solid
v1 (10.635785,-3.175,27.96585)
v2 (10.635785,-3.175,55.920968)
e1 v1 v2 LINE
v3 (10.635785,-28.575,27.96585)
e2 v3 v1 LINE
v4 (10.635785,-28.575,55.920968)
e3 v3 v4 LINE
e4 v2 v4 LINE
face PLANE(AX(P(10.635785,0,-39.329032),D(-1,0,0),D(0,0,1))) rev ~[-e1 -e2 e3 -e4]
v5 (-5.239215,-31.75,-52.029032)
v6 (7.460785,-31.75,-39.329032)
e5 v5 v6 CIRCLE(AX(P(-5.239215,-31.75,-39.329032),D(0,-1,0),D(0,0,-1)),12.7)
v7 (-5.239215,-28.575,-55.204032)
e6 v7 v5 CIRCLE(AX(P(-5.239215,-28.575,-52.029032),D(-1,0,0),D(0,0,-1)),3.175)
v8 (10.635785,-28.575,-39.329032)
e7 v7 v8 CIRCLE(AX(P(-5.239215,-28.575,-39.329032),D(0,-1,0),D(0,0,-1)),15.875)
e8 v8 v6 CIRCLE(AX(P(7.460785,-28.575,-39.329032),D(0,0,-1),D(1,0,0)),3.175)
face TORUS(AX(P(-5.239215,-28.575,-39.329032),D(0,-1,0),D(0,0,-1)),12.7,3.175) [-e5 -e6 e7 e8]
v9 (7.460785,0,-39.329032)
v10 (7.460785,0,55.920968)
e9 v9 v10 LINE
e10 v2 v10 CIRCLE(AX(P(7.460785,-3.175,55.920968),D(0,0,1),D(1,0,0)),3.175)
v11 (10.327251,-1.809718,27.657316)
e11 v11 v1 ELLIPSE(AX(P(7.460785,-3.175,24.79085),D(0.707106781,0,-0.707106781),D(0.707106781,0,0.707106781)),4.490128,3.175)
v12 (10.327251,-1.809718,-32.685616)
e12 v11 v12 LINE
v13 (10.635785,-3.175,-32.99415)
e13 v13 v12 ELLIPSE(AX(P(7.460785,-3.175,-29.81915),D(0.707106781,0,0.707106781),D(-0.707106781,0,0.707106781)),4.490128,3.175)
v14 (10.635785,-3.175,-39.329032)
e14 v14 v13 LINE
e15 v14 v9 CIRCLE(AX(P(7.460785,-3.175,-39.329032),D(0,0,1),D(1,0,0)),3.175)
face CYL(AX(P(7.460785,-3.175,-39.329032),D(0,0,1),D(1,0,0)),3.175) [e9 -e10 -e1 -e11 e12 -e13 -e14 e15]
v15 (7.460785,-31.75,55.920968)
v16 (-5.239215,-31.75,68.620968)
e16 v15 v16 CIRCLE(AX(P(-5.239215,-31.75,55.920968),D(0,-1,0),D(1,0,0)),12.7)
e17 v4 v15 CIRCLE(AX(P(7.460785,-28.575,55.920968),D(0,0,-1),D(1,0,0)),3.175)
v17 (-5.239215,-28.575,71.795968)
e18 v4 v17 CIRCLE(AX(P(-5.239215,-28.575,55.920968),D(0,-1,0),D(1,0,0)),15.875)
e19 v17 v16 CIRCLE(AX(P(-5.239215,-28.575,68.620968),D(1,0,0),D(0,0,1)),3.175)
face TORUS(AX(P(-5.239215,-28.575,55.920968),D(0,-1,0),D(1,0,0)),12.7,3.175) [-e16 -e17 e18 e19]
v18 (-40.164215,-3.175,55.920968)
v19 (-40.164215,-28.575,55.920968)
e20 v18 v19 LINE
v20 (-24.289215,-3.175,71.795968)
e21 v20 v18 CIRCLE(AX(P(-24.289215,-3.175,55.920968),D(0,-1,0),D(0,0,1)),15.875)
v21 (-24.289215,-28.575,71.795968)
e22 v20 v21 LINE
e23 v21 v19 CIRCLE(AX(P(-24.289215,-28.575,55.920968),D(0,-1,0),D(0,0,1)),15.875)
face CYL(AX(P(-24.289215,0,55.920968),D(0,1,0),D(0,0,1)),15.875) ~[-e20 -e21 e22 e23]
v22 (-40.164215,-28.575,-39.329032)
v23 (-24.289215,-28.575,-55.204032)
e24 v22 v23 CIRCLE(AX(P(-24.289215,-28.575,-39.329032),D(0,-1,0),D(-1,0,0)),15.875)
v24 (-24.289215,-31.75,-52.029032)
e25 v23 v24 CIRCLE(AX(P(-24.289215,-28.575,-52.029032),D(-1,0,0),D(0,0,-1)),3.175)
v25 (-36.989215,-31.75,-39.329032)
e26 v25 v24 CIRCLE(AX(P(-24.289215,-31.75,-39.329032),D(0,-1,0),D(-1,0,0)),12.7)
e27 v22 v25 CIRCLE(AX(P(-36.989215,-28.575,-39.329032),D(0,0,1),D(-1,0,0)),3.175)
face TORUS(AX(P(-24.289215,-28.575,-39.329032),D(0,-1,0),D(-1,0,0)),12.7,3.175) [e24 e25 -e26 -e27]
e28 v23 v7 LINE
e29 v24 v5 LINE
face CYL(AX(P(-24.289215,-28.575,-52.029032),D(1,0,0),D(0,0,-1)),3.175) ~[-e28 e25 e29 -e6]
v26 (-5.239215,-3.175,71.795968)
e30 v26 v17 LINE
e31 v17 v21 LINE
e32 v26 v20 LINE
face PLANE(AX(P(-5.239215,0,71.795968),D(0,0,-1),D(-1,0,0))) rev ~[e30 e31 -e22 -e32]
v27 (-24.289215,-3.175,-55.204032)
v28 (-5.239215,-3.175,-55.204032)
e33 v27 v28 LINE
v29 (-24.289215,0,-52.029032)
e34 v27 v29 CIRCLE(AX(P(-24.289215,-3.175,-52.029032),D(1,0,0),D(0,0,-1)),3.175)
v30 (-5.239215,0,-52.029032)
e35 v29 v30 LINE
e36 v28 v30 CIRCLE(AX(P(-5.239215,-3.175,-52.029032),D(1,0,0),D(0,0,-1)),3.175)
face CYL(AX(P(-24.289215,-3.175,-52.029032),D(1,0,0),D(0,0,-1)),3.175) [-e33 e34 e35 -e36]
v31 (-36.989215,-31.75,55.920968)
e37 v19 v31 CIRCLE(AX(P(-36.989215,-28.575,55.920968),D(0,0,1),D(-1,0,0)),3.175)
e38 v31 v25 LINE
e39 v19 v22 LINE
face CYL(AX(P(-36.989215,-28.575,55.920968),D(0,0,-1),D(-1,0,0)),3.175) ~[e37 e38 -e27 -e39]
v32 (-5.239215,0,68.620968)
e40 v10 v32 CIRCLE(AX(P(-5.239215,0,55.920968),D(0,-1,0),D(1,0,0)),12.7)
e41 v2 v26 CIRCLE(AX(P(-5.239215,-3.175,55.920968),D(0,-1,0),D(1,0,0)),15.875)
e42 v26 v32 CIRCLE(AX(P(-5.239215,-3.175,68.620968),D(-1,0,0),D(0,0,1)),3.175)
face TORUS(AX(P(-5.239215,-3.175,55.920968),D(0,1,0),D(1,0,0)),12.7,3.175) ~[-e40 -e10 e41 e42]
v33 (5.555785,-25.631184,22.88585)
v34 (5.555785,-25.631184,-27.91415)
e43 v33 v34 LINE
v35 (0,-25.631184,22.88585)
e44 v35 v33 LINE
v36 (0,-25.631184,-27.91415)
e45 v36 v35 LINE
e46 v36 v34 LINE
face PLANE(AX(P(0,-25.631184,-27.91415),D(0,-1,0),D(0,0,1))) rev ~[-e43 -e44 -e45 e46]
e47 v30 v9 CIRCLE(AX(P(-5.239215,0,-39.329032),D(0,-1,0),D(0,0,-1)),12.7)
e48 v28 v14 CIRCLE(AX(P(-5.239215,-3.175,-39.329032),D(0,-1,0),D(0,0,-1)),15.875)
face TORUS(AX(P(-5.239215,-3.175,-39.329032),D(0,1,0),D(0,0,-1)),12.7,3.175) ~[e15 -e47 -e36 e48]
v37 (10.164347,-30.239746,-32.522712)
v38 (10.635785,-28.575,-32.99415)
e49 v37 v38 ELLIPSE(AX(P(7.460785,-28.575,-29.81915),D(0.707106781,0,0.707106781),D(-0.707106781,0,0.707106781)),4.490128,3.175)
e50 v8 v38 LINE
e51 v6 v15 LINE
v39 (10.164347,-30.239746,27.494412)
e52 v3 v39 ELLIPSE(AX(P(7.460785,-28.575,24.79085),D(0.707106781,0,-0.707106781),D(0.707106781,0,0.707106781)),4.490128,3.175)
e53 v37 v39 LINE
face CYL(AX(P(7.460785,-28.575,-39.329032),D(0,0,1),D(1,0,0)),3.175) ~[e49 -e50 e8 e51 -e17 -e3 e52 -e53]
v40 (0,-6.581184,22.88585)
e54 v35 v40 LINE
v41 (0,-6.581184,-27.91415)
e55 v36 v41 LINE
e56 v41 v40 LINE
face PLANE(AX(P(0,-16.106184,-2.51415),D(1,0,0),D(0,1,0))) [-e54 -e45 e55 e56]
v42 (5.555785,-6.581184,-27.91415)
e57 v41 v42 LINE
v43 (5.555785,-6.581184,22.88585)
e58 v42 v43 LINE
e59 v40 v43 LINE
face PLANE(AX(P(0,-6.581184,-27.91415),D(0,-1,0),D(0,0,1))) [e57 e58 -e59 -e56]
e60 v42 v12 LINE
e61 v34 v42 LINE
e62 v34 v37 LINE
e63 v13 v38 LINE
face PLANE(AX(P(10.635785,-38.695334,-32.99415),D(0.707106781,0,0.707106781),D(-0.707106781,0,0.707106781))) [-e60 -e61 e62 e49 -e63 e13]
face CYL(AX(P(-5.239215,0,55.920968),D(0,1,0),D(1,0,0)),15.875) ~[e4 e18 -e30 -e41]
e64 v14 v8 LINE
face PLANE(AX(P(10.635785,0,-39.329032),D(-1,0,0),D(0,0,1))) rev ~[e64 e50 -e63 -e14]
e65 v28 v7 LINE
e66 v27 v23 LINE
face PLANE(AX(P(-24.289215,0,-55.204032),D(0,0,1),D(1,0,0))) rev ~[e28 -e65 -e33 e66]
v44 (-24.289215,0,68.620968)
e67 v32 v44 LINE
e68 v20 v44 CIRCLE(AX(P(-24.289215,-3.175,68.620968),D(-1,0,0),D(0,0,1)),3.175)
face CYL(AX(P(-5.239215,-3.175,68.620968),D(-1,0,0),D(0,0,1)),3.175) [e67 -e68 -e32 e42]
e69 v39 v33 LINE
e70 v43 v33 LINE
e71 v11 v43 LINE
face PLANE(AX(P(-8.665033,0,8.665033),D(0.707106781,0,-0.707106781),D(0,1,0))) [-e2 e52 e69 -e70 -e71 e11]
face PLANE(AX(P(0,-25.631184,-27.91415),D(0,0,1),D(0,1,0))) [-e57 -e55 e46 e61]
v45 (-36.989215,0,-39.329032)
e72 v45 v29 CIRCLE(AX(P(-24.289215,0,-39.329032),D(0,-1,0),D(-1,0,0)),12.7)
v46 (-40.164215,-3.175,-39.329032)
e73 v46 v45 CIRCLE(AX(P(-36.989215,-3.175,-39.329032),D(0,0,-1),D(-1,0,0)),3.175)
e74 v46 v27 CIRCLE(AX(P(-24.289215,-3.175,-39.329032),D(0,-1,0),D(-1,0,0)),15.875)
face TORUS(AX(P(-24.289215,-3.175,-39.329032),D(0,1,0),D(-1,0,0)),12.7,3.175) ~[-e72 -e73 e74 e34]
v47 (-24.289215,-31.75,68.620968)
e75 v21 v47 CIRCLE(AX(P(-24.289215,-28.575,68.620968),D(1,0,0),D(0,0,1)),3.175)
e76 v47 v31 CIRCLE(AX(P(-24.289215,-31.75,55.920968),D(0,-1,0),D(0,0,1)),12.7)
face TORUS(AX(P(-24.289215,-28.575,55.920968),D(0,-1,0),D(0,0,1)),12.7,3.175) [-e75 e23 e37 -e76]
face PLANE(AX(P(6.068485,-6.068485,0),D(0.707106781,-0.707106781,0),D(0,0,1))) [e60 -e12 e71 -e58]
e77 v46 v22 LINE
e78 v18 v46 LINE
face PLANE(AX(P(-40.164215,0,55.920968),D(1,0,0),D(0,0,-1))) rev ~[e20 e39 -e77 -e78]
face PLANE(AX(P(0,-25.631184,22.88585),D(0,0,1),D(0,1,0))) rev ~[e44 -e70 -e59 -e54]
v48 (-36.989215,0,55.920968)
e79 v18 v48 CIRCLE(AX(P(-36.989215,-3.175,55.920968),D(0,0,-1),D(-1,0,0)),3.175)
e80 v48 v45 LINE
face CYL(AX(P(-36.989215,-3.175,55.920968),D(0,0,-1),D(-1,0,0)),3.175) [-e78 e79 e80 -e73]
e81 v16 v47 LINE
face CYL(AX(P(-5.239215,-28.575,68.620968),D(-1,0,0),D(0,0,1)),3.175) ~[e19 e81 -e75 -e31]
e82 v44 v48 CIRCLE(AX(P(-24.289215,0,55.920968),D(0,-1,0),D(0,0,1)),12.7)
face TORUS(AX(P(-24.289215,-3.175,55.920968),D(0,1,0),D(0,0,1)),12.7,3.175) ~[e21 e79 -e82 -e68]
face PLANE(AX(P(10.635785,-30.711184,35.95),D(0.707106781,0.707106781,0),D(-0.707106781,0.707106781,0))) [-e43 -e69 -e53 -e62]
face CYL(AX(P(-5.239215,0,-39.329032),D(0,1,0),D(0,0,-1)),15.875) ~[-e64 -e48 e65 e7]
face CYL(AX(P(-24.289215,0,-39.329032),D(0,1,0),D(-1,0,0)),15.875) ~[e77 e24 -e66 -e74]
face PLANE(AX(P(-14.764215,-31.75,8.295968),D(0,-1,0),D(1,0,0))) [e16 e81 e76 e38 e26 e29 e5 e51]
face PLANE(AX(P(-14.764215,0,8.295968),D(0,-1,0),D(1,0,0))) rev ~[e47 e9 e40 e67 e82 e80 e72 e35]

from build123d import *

# Parameters (mm, degrees)
F1_DEPTH     = 31.75
F2_R         = 3.175
F3_W         = 19.05
F3_H         = 50.8
F4_DEPTH     = 10.6367849431
F5_T4_DEPTH  = 76.9282991577
F5_T10_DEPTH = 45.1782991577
F5_T16_DEPTH = 45.1782991577
F5_T22_DEPTH = 76.9282991577


# Not quite as in the source:
# - a fillet or chamfer that OpenCascade refuses, or shapes differently, is made with other operations: its cross-section is extruded or revolved along the edge and cut away or added


with BuildPart() as f1:
    # F0 (on Front) → F1 (new body)
    with BuildSketch(Plane.XZ):
        with BuildLine():
            Line((-5.2392150569, 71.7959681749), (-24.2892150569, 71.7959681749))
            ThreePointArc((-24.2892150569, 71.7959681749), (-35.5145352082, 67.1462883263), (-40.1642150569, 55.9209681749))
            Line((-40.1642150569, 55.9209681749), (-40.1642150569, -39.3290318251))
            ThreePointArc((-40.1642150569, -39.3290318251), (-35.5145352082, -50.5543519764), (-24.2892150569, -55.2040318251))
            Line((-24.2892150569, -55.2040318251), (-5.2392150569, -55.2040318251))
            ThreePointArc((-5.2392150569, -55.2040318251), (5.9861050945, -50.5543519764), (10.6357849431, -39.3290318251))
            Line((10.6357849431, -39.3290318251), (10.6357849431, 55.9209681749))
            ThreePointArc((10.6357849431, 55.9209681749), (5.9861050945, 67.1462883263), (-5.2392150569, 71.7959681749))
        make_face()
    extrude(amount=F1_DEPTH)

    # F2
    f2_edges = [f1.edges().sort_by_distance(p)[0] for p in [
        (-24.289215, -15.875, -55.204032),
        (-5.239215, -15.875, -55.204032),
        (-14.764215, 0, -55.204032),
        (-14.764215, -31.75, -55.204032),
        (-5.239215, -15.875, 71.795968),
        (-24.289215, -15.875, 71.795968),
        (-14.764215, 0, 71.795968),
        (-14.764215, -31.75, 71.795968),
        (10.635785, 0, 8.295968),
        (10.635785, -31.75, 8.295968),
        (5.986105, 0, 67.146288),
        (5.986105, -31.75, 67.146288),
        (-35.514535, 0, 67.146288),
        (-35.514535, -31.75, 67.146288),
        (-40.164215, 0, 8.295968),
        (-40.164215, -31.75, 8.295968),
        (-35.514535, 0, -50.554352),
        (-35.514535, -31.75, -50.554352),
        (5.986105, 0, -50.554352),
        (5.986105, -31.75, -50.554352),
    ]]
    fillet(f2_edges, radius=F2_R)

    # F3 (on Right) → F4 (cut, through all)
    with BuildSketch(Plane.YZ):
        with Locations((-16.1061841063, -2.5141499803)):
            Rectangle(F3_W, F3_H)
    extrude(amount=F4_DEPTH, mode=Mode.SUBTRACT)

    # F5: chamfer of 5.08 on 4 edges, made by hand


with BuildPart() as f5_tool2:
    # F5_s3 → F5_t4 (new body)
    with BuildSketch(Plane.XY.offset(35.9499995986)):
        Polygon((10.6357849431, -30.7111841063), (5.5557849431, -25.6311841063), (10.6357849431, -25.6311841063), align=None)
    extrude(amount=-F5_T4_DEPTH)

    split(bisect_by=Plane(origin=(-11.1791825186, 0, -11.1791825186), x_dir=(0, 1, 0), z_dir=(0.7071067812, 0, 0.7071067812)), keep=Keep.TOP)

    split(bisect_by=Plane(origin=(-8.6650325383, 0, 8.6650325383), x_dir=(0, 1, 0), z_dir=(0.7071067812, 0, -0.7071067812)), keep=Keep.TOP)


with BuildPart() as f1_1:
    add(f1.part)

    # F5_t1: cut F5_tool2
    add(f5_tool2.part, mode=Mode.SUBTRACT)


with BuildPart() as f5_tool8:
    # F5_s9 → F5_t10 (new body)
    with BuildSketch(Plane.XZ.offset(-6.4829654725)):
        Polygon((10.6357849431, 27.9658500197), (5.5557849431, 22.8858500197), (10.6357849431, 22.8858500197), align=None)
    extrude(amount=F5_T10_DEPTH)

    split(bisect_by=Plane(origin=(-10.0376995816, -10.0376995816, 0), x_dir=(0, 0, 1), z_dir=(0.7071067812, 0.7071067812, 0)), keep=Keep.TOP)

    split(bisect_by=Plane(origin=(6.0684845247, -6.0684845247, 0), x_dir=(0, 0, 1), z_dir=(0.7071067812, -0.7071067812, 0)), keep=Keep.TOP)


with BuildPart() as f1_2:
    add(f1_1.part)

    # F5_t7: cut F5_tool8
    add(f5_tool8.part, mode=Mode.SUBTRACT)


with BuildPart() as f5_tool14:
    # F5_s15 → F5_t16 (new body)
    with BuildSketch(Plane.XZ.offset(38.6953336852)):
        Polygon((10.6357849431, -32.9941499803), (5.5557849431, -27.9141499803), (10.6357849431, -27.9141499803), align=None)
    extrude(amount=-F5_T16_DEPTH)

    split(bisect_by=Plane(origin=(-10.0376995816, -10.0376995816, 0), x_dir=(0, 0, 1), z_dir=(0.7071067812, 0.7071067812, 0)), keep=Keep.TOP)

    split(bisect_by=Plane(origin=(6.0684845247, -6.0684845247, 0), x_dir=(0, 0, 1), z_dir=(0.7071067812, -0.7071067812, 0)), keep=Keep.TOP)


with BuildPart() as f1_3:
    add(f1_2.part)

    # F5_t13: cut F5_tool14
    add(f5_tool14.part, mode=Mode.SUBTRACT)


with BuildPart() as f5_tool20:
    # F5_s21 → F5_t22 (new body)
    with BuildSketch(Plane.XY.offset(-40.9782995592)):
        Polygon((10.6357849431, -1.5011841063), (5.5557849431, -6.5811841063), (10.6357849431, -6.5811841063), align=None)
    extrude(amount=F5_T22_DEPTH)

    split(bisect_by=Plane(origin=(-11.1791825186, 0, -11.1791825186), x_dir=(0, 1, 0), z_dir=(0.7071067812, 0, 0.7071067812)), keep=Keep.TOP)

    split(bisect_by=Plane(origin=(-8.6650325383, 0, 8.6650325383), x_dir=(0, 1, 0), z_dir=(0.7071067812, 0, -0.7071067812)), keep=Keep.TOP)


with BuildPart() as f1_4:
    add(f1_3.part)

    # F5_t19: cut F5_tool20
    add(f5_tool20.part, mode=Mode.SUBTRACT)


solid = f1_4.part
